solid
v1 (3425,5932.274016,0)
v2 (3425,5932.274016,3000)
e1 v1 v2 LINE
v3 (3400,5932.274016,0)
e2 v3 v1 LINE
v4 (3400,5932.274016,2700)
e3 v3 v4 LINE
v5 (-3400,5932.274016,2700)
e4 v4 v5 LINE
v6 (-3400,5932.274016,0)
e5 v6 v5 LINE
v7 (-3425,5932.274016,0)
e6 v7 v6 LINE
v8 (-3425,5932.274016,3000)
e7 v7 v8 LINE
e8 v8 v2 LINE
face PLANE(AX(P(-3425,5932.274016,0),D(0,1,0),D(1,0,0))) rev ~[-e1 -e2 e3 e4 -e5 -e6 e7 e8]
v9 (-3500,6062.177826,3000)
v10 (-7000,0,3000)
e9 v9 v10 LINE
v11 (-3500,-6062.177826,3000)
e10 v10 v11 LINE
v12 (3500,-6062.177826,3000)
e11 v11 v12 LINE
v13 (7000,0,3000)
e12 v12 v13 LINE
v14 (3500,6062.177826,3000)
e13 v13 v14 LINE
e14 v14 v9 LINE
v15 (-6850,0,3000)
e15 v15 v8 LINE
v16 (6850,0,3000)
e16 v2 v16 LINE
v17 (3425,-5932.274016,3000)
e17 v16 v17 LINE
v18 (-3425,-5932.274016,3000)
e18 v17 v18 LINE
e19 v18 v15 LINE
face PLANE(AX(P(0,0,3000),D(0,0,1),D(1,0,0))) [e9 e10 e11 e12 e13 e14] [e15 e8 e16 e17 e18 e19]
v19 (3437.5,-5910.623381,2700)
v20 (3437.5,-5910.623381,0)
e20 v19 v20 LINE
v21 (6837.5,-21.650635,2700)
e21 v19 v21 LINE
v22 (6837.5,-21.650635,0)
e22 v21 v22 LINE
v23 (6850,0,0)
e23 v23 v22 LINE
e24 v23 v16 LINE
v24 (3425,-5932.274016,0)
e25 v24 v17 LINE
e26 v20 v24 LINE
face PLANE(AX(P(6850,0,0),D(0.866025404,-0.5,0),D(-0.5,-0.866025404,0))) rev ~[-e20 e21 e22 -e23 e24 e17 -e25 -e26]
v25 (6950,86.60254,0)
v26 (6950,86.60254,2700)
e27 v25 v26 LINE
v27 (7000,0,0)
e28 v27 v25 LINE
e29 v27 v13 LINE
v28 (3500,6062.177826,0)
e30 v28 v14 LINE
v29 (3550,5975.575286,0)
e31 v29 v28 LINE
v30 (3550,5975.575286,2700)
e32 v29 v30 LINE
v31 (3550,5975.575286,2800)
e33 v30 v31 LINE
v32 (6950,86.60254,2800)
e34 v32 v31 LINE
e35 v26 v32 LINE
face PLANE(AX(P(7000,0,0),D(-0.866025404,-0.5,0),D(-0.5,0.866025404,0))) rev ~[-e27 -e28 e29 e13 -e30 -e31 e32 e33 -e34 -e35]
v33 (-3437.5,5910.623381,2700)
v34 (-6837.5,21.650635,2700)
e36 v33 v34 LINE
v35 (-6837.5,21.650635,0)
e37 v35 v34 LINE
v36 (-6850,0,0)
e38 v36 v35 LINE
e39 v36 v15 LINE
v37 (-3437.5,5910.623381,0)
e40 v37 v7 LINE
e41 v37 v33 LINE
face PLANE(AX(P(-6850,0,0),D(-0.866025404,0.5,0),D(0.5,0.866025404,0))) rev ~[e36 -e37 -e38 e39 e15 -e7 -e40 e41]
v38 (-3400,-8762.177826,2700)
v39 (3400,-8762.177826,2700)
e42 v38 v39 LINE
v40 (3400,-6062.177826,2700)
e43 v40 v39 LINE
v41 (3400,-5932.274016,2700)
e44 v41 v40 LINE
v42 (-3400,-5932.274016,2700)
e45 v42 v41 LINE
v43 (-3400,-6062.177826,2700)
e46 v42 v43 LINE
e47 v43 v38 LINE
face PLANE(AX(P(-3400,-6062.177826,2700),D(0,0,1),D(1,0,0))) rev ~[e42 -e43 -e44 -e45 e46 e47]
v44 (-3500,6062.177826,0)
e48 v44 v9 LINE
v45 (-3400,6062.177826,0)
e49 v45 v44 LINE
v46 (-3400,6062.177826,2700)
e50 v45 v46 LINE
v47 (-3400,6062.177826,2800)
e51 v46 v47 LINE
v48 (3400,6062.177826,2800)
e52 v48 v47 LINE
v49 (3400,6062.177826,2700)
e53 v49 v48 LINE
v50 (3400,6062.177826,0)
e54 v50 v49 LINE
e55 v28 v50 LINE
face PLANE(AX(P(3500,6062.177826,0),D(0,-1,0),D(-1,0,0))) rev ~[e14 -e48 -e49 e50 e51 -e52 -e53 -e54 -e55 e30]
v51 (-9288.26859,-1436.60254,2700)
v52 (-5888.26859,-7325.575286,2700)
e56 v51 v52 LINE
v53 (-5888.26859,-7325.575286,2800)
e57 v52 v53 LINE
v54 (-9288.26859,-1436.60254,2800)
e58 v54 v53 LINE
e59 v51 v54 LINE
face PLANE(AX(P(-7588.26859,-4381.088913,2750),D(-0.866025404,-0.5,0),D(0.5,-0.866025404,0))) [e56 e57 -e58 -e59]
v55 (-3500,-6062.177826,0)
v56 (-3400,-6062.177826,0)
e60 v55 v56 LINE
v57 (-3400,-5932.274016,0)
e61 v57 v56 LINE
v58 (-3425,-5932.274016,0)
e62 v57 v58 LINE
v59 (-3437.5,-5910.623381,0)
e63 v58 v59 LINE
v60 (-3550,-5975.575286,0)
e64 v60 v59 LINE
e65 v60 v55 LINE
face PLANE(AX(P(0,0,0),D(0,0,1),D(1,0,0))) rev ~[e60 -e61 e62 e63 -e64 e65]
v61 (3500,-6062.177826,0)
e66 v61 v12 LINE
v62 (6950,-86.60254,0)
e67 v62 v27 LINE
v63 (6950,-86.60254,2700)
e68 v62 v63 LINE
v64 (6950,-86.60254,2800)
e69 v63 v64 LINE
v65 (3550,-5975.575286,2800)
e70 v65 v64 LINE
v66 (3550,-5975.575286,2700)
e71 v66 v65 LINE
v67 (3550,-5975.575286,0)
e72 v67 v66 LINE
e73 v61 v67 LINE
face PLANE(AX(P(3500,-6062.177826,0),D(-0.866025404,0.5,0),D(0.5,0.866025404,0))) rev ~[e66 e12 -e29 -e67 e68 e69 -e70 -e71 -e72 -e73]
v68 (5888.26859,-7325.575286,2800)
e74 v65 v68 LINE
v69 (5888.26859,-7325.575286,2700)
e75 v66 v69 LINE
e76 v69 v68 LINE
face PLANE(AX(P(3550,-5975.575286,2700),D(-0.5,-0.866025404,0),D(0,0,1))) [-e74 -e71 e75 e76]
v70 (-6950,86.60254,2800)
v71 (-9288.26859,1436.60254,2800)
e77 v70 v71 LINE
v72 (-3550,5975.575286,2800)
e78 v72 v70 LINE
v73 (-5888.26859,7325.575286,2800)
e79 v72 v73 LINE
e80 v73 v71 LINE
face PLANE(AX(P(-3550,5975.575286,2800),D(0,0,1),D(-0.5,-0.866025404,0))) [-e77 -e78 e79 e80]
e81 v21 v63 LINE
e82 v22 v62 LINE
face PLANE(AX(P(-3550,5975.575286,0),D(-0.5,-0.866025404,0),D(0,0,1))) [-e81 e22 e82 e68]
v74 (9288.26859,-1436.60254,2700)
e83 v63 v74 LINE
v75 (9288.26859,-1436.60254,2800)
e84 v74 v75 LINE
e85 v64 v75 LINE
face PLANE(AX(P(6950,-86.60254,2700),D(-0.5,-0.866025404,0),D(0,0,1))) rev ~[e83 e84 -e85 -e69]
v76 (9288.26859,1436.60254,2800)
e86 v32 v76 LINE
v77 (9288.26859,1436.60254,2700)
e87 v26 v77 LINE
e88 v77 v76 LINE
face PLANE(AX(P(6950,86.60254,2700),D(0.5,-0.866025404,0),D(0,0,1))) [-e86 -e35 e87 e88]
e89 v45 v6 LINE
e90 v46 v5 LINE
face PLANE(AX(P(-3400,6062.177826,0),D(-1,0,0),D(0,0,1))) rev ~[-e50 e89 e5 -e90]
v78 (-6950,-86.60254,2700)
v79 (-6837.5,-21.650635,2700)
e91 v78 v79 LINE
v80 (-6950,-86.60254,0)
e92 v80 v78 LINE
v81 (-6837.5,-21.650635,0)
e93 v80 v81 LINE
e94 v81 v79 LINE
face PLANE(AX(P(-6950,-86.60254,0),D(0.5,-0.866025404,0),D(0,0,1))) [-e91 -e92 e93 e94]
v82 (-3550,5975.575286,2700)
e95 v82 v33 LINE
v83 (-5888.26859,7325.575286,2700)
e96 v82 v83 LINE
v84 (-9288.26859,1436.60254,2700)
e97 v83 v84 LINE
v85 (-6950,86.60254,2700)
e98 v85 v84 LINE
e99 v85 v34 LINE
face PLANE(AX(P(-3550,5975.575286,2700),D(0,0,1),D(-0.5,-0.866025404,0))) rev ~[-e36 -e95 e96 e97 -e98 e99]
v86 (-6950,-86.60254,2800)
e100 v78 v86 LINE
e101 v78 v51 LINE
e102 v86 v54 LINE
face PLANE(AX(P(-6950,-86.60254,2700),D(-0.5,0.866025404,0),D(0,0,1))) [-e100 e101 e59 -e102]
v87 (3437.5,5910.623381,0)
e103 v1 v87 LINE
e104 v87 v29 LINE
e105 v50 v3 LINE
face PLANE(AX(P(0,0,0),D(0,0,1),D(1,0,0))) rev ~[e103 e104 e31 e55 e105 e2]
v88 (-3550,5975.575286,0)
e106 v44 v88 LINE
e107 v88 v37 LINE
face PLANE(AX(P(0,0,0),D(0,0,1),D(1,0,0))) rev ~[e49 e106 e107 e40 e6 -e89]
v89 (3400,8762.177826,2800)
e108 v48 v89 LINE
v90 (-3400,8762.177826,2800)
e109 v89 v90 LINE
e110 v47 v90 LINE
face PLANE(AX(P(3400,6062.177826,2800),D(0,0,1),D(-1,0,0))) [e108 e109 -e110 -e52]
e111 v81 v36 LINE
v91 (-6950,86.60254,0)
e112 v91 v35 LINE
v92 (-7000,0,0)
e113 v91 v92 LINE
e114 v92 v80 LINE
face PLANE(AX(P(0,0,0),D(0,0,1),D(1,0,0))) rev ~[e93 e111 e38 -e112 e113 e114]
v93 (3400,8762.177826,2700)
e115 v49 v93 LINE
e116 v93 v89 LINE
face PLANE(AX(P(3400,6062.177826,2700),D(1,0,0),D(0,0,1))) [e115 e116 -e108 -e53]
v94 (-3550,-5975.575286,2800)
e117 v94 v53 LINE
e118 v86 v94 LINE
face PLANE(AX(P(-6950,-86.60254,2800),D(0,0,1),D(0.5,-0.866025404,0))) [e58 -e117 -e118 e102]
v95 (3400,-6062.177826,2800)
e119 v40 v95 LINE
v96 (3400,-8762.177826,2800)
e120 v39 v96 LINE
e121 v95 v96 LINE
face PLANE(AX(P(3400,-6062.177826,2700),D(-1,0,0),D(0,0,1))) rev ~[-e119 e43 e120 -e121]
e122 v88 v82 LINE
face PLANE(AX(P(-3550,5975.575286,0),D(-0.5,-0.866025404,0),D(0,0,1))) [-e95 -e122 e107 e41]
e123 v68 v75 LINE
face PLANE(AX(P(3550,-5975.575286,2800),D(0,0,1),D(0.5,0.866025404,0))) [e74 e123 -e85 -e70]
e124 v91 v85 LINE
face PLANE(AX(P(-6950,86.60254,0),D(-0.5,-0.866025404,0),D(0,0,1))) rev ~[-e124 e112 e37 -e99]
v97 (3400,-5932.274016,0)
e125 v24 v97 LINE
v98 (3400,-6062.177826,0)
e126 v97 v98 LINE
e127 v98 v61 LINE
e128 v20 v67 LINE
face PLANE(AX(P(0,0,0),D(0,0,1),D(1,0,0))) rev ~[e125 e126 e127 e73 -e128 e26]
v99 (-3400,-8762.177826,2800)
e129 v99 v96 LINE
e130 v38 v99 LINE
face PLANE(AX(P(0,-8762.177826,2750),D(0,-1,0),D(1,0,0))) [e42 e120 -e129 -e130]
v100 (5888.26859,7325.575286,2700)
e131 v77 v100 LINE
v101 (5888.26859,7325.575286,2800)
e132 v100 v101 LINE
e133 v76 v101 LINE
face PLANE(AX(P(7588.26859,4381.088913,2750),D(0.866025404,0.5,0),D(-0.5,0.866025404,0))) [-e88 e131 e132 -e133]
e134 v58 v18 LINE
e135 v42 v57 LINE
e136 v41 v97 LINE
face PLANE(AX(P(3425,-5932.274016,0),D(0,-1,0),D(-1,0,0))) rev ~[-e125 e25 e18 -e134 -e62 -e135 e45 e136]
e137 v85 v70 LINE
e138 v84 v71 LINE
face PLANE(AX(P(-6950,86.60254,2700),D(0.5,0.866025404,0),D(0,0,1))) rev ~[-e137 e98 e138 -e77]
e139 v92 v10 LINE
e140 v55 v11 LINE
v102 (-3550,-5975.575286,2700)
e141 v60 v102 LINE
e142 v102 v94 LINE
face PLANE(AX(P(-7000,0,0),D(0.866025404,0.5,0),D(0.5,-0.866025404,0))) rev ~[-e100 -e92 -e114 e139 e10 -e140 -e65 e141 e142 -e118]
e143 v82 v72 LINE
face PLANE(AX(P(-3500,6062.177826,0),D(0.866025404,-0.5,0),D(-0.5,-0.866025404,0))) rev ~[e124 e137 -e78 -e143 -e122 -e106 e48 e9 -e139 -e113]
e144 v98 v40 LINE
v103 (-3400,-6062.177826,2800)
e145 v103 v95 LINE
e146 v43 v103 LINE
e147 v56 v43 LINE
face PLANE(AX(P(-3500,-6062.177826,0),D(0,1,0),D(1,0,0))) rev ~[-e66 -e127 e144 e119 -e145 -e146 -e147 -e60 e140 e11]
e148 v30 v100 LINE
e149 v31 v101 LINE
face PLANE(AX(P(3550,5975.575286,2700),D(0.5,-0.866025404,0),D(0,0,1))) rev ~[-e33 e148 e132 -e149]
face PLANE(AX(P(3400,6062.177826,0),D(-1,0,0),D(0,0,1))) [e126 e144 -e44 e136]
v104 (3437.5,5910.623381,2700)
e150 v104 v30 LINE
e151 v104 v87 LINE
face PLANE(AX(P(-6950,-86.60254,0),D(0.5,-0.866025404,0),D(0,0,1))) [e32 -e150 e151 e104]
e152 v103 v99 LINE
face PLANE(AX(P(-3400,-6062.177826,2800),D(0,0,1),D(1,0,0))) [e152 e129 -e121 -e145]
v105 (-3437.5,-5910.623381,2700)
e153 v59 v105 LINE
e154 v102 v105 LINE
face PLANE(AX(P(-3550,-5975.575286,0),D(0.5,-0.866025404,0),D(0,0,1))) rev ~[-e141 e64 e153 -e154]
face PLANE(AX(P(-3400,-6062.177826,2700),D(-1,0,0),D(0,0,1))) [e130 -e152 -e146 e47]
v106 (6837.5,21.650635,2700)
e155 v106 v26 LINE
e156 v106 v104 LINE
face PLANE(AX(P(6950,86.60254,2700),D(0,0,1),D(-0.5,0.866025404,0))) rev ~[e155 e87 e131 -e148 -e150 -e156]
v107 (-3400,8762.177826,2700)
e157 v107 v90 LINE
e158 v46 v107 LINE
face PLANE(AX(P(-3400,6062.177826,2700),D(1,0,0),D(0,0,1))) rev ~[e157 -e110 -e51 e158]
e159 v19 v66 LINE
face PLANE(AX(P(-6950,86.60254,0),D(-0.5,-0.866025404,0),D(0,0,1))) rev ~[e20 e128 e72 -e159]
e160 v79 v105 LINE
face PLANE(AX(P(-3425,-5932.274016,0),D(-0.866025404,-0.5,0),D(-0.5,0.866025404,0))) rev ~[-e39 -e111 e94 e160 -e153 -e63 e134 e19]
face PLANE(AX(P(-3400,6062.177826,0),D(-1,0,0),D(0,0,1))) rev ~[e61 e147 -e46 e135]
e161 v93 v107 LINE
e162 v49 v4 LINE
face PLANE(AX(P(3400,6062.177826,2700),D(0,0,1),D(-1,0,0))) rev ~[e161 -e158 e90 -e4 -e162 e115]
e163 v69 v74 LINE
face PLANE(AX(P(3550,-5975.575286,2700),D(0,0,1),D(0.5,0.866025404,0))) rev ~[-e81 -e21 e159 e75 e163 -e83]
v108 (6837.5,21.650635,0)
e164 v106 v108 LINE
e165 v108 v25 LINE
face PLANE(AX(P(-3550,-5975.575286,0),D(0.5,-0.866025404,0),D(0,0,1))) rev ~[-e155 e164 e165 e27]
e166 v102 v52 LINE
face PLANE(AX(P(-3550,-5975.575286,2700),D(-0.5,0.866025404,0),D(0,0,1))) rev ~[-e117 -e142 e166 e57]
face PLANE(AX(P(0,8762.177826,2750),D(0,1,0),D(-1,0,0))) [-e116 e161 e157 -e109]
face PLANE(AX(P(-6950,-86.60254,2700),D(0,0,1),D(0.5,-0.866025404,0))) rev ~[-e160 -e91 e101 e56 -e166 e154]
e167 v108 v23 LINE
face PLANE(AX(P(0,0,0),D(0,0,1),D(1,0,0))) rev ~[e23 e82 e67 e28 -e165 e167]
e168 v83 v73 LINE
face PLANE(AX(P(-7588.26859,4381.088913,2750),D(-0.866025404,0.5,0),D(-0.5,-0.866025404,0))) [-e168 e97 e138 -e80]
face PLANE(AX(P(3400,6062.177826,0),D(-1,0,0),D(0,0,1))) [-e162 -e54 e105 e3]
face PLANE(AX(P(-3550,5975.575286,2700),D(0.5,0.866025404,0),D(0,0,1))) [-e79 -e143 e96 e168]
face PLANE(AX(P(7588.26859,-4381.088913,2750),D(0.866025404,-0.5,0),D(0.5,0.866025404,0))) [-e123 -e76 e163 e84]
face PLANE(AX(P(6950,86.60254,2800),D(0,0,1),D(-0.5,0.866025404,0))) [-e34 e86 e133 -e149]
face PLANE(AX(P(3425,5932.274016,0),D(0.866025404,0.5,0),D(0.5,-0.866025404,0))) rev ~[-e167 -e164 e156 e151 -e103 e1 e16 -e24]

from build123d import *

# Parameters (mm, degrees)
F1_DEPTH  = 3000
F2_W      = 6800
F2_H      = 2700
F3_DEPTH  = 15155.4455662277
F4_W      = 6800
F4_H      = 2700
F5_DEPTH  = 15155.4455662277
F6_W      = 6800
F6_H      = 2700
F7_DEPTH  = 12124.3566529821
F8_W      = 6800
F8_H      = 100
F9_DEPTH  = 2700
F10_W     = 6800
F10_H     = 100
F11_DEPTH = 2700
F12_W     = 6800
F12_H     = 100
F13_DEPTH = 2700
F14_W     = 6800
F14_H     = 100
F15_DEPTH = 2700
F16_W     = 6800
F16_H     = 100
F17_DEPTH = 2700
F18_W     = 6800
F18_H     = 100
F19_DEPTH = 2700


with BuildPart() as f1:
    # F0 (on Top) → F1 (new body)
    with BuildSketch(Plane.XY):
        Polygon((3500, -6062.1778264911), (7000, 0), (3500, 6062.1778264911), (-3500, 6062.1778264911), (-7000, 0), (-3500, -6062.1778264911), align=None)
        Polygon((3425, 5932.2740159234), (6850, 0), (3425, -5932.2740159234), (-3425, -5932.2740159234), (-6850, 0), (-3425, 5932.2740159234), align=None, mode=Mode.SUBTRACT)
    extrude(amount=F1_DEPTH)

    # F2 (on face) → F3 (cut, through all)
    with BuildSketch(Plane(origin=(-5250, -3031.0889132455, 0), x_dir=(0.5, -0.8660254038, 0), z_dir=(-0.8660254038, -0.5, 0))):
        with Locations((0, 1350)):
            Rectangle(F2_W, F2_H)
    extrude(amount=-F3_DEPTH, mode=Mode.SUBTRACT)

    # F4 (on face) → F5 (cut, through all)
    with BuildSketch(Plane(origin=(-5250, 3031.0889132455, 0), x_dir=(-0.5, -0.8660254038, 0), z_dir=(-0.8660254038, 0.5, 0))):
        with Locations((0, 1350)):
            Rectangle(F4_W, F4_H)
    extrude(amount=-F5_DEPTH, mode=Mode.SUBTRACT)

    # F6 (on face) → F7 (cut, through all)
    with BuildSketch(Plane(origin=(0, 6062.1778264911, 0), x_dir=(-1, 0, 0), z_dir=(0, 1, 0))):
        with Locations((0, 1350)):
            Rectangle(F6_W, F6_H)
    extrude(amount=-F7_DEPTH, mode=Mode.SUBTRACT)

    # F8 (on face) → F9 (join)
    with BuildSketch(Plane(origin=(0, 6062.1778264911, 0), x_dir=(-1, 0, 0), z_dir=(0, 1, 0))):
        with Locations((0, 2750)):
            Rectangle(F8_W, F8_H)
    extrude(amount=F9_DEPTH)

    # F10 (on face) → F11 (join)
    with BuildSketch(Plane(origin=(5250, 3031.0889132455, 0), x_dir=(-0.5, 0.8660254038, 0), z_dir=(0.8660254038, 0.5, 0))):
        with Locations((0, 2750)):
            Rectangle(F10_W, F10_H)
    extrude(amount=F11_DEPTH)

    # F12 (on face) → F13 (join)
    with BuildSketch(Plane(origin=(5250, -3031.0889132455, 0), x_dir=(0.5, 0.8660254038, 0), z_dir=(0.8660254038, -0.5, 0))):
        with Locations((0, 2750)):
            Rectangle(F12_W, F12_H)
    extrude(amount=F13_DEPTH)

    # F14 (on face) → F15 (join)
    with BuildSketch(Plane.XZ.offset(6062.1778264911)):
        with Locations((0, 2750)):
            Rectangle(F14_W, F14_H)
    extrude(amount=F15_DEPTH)

    # F16 (on face) → F17 (join)
    with BuildSketch(Plane(origin=(-5250, -3031.0889132455, 0), x_dir=(0.5, -0.8660254038, 0), z_dir=(-0.8660254038, -0.5, 0))):
        with Locations((0, 2750)):
            Rectangle(F16_W, F16_H)
    extrude(amount=F17_DEPTH)

    # F18 (on face) → F19 (join)
    with BuildSketch(Plane(origin=(-5250, 3031.0889132455, 0), x_dir=(-0.5, -0.8660254038, 0), z_dir=(-0.8660254038, 0.5, 0))):
        with Locations((0, 2750)):
            Rectangle(F18_W, F18_H)
    extrude(amount=F19_DEPTH)


solid = f1.part
